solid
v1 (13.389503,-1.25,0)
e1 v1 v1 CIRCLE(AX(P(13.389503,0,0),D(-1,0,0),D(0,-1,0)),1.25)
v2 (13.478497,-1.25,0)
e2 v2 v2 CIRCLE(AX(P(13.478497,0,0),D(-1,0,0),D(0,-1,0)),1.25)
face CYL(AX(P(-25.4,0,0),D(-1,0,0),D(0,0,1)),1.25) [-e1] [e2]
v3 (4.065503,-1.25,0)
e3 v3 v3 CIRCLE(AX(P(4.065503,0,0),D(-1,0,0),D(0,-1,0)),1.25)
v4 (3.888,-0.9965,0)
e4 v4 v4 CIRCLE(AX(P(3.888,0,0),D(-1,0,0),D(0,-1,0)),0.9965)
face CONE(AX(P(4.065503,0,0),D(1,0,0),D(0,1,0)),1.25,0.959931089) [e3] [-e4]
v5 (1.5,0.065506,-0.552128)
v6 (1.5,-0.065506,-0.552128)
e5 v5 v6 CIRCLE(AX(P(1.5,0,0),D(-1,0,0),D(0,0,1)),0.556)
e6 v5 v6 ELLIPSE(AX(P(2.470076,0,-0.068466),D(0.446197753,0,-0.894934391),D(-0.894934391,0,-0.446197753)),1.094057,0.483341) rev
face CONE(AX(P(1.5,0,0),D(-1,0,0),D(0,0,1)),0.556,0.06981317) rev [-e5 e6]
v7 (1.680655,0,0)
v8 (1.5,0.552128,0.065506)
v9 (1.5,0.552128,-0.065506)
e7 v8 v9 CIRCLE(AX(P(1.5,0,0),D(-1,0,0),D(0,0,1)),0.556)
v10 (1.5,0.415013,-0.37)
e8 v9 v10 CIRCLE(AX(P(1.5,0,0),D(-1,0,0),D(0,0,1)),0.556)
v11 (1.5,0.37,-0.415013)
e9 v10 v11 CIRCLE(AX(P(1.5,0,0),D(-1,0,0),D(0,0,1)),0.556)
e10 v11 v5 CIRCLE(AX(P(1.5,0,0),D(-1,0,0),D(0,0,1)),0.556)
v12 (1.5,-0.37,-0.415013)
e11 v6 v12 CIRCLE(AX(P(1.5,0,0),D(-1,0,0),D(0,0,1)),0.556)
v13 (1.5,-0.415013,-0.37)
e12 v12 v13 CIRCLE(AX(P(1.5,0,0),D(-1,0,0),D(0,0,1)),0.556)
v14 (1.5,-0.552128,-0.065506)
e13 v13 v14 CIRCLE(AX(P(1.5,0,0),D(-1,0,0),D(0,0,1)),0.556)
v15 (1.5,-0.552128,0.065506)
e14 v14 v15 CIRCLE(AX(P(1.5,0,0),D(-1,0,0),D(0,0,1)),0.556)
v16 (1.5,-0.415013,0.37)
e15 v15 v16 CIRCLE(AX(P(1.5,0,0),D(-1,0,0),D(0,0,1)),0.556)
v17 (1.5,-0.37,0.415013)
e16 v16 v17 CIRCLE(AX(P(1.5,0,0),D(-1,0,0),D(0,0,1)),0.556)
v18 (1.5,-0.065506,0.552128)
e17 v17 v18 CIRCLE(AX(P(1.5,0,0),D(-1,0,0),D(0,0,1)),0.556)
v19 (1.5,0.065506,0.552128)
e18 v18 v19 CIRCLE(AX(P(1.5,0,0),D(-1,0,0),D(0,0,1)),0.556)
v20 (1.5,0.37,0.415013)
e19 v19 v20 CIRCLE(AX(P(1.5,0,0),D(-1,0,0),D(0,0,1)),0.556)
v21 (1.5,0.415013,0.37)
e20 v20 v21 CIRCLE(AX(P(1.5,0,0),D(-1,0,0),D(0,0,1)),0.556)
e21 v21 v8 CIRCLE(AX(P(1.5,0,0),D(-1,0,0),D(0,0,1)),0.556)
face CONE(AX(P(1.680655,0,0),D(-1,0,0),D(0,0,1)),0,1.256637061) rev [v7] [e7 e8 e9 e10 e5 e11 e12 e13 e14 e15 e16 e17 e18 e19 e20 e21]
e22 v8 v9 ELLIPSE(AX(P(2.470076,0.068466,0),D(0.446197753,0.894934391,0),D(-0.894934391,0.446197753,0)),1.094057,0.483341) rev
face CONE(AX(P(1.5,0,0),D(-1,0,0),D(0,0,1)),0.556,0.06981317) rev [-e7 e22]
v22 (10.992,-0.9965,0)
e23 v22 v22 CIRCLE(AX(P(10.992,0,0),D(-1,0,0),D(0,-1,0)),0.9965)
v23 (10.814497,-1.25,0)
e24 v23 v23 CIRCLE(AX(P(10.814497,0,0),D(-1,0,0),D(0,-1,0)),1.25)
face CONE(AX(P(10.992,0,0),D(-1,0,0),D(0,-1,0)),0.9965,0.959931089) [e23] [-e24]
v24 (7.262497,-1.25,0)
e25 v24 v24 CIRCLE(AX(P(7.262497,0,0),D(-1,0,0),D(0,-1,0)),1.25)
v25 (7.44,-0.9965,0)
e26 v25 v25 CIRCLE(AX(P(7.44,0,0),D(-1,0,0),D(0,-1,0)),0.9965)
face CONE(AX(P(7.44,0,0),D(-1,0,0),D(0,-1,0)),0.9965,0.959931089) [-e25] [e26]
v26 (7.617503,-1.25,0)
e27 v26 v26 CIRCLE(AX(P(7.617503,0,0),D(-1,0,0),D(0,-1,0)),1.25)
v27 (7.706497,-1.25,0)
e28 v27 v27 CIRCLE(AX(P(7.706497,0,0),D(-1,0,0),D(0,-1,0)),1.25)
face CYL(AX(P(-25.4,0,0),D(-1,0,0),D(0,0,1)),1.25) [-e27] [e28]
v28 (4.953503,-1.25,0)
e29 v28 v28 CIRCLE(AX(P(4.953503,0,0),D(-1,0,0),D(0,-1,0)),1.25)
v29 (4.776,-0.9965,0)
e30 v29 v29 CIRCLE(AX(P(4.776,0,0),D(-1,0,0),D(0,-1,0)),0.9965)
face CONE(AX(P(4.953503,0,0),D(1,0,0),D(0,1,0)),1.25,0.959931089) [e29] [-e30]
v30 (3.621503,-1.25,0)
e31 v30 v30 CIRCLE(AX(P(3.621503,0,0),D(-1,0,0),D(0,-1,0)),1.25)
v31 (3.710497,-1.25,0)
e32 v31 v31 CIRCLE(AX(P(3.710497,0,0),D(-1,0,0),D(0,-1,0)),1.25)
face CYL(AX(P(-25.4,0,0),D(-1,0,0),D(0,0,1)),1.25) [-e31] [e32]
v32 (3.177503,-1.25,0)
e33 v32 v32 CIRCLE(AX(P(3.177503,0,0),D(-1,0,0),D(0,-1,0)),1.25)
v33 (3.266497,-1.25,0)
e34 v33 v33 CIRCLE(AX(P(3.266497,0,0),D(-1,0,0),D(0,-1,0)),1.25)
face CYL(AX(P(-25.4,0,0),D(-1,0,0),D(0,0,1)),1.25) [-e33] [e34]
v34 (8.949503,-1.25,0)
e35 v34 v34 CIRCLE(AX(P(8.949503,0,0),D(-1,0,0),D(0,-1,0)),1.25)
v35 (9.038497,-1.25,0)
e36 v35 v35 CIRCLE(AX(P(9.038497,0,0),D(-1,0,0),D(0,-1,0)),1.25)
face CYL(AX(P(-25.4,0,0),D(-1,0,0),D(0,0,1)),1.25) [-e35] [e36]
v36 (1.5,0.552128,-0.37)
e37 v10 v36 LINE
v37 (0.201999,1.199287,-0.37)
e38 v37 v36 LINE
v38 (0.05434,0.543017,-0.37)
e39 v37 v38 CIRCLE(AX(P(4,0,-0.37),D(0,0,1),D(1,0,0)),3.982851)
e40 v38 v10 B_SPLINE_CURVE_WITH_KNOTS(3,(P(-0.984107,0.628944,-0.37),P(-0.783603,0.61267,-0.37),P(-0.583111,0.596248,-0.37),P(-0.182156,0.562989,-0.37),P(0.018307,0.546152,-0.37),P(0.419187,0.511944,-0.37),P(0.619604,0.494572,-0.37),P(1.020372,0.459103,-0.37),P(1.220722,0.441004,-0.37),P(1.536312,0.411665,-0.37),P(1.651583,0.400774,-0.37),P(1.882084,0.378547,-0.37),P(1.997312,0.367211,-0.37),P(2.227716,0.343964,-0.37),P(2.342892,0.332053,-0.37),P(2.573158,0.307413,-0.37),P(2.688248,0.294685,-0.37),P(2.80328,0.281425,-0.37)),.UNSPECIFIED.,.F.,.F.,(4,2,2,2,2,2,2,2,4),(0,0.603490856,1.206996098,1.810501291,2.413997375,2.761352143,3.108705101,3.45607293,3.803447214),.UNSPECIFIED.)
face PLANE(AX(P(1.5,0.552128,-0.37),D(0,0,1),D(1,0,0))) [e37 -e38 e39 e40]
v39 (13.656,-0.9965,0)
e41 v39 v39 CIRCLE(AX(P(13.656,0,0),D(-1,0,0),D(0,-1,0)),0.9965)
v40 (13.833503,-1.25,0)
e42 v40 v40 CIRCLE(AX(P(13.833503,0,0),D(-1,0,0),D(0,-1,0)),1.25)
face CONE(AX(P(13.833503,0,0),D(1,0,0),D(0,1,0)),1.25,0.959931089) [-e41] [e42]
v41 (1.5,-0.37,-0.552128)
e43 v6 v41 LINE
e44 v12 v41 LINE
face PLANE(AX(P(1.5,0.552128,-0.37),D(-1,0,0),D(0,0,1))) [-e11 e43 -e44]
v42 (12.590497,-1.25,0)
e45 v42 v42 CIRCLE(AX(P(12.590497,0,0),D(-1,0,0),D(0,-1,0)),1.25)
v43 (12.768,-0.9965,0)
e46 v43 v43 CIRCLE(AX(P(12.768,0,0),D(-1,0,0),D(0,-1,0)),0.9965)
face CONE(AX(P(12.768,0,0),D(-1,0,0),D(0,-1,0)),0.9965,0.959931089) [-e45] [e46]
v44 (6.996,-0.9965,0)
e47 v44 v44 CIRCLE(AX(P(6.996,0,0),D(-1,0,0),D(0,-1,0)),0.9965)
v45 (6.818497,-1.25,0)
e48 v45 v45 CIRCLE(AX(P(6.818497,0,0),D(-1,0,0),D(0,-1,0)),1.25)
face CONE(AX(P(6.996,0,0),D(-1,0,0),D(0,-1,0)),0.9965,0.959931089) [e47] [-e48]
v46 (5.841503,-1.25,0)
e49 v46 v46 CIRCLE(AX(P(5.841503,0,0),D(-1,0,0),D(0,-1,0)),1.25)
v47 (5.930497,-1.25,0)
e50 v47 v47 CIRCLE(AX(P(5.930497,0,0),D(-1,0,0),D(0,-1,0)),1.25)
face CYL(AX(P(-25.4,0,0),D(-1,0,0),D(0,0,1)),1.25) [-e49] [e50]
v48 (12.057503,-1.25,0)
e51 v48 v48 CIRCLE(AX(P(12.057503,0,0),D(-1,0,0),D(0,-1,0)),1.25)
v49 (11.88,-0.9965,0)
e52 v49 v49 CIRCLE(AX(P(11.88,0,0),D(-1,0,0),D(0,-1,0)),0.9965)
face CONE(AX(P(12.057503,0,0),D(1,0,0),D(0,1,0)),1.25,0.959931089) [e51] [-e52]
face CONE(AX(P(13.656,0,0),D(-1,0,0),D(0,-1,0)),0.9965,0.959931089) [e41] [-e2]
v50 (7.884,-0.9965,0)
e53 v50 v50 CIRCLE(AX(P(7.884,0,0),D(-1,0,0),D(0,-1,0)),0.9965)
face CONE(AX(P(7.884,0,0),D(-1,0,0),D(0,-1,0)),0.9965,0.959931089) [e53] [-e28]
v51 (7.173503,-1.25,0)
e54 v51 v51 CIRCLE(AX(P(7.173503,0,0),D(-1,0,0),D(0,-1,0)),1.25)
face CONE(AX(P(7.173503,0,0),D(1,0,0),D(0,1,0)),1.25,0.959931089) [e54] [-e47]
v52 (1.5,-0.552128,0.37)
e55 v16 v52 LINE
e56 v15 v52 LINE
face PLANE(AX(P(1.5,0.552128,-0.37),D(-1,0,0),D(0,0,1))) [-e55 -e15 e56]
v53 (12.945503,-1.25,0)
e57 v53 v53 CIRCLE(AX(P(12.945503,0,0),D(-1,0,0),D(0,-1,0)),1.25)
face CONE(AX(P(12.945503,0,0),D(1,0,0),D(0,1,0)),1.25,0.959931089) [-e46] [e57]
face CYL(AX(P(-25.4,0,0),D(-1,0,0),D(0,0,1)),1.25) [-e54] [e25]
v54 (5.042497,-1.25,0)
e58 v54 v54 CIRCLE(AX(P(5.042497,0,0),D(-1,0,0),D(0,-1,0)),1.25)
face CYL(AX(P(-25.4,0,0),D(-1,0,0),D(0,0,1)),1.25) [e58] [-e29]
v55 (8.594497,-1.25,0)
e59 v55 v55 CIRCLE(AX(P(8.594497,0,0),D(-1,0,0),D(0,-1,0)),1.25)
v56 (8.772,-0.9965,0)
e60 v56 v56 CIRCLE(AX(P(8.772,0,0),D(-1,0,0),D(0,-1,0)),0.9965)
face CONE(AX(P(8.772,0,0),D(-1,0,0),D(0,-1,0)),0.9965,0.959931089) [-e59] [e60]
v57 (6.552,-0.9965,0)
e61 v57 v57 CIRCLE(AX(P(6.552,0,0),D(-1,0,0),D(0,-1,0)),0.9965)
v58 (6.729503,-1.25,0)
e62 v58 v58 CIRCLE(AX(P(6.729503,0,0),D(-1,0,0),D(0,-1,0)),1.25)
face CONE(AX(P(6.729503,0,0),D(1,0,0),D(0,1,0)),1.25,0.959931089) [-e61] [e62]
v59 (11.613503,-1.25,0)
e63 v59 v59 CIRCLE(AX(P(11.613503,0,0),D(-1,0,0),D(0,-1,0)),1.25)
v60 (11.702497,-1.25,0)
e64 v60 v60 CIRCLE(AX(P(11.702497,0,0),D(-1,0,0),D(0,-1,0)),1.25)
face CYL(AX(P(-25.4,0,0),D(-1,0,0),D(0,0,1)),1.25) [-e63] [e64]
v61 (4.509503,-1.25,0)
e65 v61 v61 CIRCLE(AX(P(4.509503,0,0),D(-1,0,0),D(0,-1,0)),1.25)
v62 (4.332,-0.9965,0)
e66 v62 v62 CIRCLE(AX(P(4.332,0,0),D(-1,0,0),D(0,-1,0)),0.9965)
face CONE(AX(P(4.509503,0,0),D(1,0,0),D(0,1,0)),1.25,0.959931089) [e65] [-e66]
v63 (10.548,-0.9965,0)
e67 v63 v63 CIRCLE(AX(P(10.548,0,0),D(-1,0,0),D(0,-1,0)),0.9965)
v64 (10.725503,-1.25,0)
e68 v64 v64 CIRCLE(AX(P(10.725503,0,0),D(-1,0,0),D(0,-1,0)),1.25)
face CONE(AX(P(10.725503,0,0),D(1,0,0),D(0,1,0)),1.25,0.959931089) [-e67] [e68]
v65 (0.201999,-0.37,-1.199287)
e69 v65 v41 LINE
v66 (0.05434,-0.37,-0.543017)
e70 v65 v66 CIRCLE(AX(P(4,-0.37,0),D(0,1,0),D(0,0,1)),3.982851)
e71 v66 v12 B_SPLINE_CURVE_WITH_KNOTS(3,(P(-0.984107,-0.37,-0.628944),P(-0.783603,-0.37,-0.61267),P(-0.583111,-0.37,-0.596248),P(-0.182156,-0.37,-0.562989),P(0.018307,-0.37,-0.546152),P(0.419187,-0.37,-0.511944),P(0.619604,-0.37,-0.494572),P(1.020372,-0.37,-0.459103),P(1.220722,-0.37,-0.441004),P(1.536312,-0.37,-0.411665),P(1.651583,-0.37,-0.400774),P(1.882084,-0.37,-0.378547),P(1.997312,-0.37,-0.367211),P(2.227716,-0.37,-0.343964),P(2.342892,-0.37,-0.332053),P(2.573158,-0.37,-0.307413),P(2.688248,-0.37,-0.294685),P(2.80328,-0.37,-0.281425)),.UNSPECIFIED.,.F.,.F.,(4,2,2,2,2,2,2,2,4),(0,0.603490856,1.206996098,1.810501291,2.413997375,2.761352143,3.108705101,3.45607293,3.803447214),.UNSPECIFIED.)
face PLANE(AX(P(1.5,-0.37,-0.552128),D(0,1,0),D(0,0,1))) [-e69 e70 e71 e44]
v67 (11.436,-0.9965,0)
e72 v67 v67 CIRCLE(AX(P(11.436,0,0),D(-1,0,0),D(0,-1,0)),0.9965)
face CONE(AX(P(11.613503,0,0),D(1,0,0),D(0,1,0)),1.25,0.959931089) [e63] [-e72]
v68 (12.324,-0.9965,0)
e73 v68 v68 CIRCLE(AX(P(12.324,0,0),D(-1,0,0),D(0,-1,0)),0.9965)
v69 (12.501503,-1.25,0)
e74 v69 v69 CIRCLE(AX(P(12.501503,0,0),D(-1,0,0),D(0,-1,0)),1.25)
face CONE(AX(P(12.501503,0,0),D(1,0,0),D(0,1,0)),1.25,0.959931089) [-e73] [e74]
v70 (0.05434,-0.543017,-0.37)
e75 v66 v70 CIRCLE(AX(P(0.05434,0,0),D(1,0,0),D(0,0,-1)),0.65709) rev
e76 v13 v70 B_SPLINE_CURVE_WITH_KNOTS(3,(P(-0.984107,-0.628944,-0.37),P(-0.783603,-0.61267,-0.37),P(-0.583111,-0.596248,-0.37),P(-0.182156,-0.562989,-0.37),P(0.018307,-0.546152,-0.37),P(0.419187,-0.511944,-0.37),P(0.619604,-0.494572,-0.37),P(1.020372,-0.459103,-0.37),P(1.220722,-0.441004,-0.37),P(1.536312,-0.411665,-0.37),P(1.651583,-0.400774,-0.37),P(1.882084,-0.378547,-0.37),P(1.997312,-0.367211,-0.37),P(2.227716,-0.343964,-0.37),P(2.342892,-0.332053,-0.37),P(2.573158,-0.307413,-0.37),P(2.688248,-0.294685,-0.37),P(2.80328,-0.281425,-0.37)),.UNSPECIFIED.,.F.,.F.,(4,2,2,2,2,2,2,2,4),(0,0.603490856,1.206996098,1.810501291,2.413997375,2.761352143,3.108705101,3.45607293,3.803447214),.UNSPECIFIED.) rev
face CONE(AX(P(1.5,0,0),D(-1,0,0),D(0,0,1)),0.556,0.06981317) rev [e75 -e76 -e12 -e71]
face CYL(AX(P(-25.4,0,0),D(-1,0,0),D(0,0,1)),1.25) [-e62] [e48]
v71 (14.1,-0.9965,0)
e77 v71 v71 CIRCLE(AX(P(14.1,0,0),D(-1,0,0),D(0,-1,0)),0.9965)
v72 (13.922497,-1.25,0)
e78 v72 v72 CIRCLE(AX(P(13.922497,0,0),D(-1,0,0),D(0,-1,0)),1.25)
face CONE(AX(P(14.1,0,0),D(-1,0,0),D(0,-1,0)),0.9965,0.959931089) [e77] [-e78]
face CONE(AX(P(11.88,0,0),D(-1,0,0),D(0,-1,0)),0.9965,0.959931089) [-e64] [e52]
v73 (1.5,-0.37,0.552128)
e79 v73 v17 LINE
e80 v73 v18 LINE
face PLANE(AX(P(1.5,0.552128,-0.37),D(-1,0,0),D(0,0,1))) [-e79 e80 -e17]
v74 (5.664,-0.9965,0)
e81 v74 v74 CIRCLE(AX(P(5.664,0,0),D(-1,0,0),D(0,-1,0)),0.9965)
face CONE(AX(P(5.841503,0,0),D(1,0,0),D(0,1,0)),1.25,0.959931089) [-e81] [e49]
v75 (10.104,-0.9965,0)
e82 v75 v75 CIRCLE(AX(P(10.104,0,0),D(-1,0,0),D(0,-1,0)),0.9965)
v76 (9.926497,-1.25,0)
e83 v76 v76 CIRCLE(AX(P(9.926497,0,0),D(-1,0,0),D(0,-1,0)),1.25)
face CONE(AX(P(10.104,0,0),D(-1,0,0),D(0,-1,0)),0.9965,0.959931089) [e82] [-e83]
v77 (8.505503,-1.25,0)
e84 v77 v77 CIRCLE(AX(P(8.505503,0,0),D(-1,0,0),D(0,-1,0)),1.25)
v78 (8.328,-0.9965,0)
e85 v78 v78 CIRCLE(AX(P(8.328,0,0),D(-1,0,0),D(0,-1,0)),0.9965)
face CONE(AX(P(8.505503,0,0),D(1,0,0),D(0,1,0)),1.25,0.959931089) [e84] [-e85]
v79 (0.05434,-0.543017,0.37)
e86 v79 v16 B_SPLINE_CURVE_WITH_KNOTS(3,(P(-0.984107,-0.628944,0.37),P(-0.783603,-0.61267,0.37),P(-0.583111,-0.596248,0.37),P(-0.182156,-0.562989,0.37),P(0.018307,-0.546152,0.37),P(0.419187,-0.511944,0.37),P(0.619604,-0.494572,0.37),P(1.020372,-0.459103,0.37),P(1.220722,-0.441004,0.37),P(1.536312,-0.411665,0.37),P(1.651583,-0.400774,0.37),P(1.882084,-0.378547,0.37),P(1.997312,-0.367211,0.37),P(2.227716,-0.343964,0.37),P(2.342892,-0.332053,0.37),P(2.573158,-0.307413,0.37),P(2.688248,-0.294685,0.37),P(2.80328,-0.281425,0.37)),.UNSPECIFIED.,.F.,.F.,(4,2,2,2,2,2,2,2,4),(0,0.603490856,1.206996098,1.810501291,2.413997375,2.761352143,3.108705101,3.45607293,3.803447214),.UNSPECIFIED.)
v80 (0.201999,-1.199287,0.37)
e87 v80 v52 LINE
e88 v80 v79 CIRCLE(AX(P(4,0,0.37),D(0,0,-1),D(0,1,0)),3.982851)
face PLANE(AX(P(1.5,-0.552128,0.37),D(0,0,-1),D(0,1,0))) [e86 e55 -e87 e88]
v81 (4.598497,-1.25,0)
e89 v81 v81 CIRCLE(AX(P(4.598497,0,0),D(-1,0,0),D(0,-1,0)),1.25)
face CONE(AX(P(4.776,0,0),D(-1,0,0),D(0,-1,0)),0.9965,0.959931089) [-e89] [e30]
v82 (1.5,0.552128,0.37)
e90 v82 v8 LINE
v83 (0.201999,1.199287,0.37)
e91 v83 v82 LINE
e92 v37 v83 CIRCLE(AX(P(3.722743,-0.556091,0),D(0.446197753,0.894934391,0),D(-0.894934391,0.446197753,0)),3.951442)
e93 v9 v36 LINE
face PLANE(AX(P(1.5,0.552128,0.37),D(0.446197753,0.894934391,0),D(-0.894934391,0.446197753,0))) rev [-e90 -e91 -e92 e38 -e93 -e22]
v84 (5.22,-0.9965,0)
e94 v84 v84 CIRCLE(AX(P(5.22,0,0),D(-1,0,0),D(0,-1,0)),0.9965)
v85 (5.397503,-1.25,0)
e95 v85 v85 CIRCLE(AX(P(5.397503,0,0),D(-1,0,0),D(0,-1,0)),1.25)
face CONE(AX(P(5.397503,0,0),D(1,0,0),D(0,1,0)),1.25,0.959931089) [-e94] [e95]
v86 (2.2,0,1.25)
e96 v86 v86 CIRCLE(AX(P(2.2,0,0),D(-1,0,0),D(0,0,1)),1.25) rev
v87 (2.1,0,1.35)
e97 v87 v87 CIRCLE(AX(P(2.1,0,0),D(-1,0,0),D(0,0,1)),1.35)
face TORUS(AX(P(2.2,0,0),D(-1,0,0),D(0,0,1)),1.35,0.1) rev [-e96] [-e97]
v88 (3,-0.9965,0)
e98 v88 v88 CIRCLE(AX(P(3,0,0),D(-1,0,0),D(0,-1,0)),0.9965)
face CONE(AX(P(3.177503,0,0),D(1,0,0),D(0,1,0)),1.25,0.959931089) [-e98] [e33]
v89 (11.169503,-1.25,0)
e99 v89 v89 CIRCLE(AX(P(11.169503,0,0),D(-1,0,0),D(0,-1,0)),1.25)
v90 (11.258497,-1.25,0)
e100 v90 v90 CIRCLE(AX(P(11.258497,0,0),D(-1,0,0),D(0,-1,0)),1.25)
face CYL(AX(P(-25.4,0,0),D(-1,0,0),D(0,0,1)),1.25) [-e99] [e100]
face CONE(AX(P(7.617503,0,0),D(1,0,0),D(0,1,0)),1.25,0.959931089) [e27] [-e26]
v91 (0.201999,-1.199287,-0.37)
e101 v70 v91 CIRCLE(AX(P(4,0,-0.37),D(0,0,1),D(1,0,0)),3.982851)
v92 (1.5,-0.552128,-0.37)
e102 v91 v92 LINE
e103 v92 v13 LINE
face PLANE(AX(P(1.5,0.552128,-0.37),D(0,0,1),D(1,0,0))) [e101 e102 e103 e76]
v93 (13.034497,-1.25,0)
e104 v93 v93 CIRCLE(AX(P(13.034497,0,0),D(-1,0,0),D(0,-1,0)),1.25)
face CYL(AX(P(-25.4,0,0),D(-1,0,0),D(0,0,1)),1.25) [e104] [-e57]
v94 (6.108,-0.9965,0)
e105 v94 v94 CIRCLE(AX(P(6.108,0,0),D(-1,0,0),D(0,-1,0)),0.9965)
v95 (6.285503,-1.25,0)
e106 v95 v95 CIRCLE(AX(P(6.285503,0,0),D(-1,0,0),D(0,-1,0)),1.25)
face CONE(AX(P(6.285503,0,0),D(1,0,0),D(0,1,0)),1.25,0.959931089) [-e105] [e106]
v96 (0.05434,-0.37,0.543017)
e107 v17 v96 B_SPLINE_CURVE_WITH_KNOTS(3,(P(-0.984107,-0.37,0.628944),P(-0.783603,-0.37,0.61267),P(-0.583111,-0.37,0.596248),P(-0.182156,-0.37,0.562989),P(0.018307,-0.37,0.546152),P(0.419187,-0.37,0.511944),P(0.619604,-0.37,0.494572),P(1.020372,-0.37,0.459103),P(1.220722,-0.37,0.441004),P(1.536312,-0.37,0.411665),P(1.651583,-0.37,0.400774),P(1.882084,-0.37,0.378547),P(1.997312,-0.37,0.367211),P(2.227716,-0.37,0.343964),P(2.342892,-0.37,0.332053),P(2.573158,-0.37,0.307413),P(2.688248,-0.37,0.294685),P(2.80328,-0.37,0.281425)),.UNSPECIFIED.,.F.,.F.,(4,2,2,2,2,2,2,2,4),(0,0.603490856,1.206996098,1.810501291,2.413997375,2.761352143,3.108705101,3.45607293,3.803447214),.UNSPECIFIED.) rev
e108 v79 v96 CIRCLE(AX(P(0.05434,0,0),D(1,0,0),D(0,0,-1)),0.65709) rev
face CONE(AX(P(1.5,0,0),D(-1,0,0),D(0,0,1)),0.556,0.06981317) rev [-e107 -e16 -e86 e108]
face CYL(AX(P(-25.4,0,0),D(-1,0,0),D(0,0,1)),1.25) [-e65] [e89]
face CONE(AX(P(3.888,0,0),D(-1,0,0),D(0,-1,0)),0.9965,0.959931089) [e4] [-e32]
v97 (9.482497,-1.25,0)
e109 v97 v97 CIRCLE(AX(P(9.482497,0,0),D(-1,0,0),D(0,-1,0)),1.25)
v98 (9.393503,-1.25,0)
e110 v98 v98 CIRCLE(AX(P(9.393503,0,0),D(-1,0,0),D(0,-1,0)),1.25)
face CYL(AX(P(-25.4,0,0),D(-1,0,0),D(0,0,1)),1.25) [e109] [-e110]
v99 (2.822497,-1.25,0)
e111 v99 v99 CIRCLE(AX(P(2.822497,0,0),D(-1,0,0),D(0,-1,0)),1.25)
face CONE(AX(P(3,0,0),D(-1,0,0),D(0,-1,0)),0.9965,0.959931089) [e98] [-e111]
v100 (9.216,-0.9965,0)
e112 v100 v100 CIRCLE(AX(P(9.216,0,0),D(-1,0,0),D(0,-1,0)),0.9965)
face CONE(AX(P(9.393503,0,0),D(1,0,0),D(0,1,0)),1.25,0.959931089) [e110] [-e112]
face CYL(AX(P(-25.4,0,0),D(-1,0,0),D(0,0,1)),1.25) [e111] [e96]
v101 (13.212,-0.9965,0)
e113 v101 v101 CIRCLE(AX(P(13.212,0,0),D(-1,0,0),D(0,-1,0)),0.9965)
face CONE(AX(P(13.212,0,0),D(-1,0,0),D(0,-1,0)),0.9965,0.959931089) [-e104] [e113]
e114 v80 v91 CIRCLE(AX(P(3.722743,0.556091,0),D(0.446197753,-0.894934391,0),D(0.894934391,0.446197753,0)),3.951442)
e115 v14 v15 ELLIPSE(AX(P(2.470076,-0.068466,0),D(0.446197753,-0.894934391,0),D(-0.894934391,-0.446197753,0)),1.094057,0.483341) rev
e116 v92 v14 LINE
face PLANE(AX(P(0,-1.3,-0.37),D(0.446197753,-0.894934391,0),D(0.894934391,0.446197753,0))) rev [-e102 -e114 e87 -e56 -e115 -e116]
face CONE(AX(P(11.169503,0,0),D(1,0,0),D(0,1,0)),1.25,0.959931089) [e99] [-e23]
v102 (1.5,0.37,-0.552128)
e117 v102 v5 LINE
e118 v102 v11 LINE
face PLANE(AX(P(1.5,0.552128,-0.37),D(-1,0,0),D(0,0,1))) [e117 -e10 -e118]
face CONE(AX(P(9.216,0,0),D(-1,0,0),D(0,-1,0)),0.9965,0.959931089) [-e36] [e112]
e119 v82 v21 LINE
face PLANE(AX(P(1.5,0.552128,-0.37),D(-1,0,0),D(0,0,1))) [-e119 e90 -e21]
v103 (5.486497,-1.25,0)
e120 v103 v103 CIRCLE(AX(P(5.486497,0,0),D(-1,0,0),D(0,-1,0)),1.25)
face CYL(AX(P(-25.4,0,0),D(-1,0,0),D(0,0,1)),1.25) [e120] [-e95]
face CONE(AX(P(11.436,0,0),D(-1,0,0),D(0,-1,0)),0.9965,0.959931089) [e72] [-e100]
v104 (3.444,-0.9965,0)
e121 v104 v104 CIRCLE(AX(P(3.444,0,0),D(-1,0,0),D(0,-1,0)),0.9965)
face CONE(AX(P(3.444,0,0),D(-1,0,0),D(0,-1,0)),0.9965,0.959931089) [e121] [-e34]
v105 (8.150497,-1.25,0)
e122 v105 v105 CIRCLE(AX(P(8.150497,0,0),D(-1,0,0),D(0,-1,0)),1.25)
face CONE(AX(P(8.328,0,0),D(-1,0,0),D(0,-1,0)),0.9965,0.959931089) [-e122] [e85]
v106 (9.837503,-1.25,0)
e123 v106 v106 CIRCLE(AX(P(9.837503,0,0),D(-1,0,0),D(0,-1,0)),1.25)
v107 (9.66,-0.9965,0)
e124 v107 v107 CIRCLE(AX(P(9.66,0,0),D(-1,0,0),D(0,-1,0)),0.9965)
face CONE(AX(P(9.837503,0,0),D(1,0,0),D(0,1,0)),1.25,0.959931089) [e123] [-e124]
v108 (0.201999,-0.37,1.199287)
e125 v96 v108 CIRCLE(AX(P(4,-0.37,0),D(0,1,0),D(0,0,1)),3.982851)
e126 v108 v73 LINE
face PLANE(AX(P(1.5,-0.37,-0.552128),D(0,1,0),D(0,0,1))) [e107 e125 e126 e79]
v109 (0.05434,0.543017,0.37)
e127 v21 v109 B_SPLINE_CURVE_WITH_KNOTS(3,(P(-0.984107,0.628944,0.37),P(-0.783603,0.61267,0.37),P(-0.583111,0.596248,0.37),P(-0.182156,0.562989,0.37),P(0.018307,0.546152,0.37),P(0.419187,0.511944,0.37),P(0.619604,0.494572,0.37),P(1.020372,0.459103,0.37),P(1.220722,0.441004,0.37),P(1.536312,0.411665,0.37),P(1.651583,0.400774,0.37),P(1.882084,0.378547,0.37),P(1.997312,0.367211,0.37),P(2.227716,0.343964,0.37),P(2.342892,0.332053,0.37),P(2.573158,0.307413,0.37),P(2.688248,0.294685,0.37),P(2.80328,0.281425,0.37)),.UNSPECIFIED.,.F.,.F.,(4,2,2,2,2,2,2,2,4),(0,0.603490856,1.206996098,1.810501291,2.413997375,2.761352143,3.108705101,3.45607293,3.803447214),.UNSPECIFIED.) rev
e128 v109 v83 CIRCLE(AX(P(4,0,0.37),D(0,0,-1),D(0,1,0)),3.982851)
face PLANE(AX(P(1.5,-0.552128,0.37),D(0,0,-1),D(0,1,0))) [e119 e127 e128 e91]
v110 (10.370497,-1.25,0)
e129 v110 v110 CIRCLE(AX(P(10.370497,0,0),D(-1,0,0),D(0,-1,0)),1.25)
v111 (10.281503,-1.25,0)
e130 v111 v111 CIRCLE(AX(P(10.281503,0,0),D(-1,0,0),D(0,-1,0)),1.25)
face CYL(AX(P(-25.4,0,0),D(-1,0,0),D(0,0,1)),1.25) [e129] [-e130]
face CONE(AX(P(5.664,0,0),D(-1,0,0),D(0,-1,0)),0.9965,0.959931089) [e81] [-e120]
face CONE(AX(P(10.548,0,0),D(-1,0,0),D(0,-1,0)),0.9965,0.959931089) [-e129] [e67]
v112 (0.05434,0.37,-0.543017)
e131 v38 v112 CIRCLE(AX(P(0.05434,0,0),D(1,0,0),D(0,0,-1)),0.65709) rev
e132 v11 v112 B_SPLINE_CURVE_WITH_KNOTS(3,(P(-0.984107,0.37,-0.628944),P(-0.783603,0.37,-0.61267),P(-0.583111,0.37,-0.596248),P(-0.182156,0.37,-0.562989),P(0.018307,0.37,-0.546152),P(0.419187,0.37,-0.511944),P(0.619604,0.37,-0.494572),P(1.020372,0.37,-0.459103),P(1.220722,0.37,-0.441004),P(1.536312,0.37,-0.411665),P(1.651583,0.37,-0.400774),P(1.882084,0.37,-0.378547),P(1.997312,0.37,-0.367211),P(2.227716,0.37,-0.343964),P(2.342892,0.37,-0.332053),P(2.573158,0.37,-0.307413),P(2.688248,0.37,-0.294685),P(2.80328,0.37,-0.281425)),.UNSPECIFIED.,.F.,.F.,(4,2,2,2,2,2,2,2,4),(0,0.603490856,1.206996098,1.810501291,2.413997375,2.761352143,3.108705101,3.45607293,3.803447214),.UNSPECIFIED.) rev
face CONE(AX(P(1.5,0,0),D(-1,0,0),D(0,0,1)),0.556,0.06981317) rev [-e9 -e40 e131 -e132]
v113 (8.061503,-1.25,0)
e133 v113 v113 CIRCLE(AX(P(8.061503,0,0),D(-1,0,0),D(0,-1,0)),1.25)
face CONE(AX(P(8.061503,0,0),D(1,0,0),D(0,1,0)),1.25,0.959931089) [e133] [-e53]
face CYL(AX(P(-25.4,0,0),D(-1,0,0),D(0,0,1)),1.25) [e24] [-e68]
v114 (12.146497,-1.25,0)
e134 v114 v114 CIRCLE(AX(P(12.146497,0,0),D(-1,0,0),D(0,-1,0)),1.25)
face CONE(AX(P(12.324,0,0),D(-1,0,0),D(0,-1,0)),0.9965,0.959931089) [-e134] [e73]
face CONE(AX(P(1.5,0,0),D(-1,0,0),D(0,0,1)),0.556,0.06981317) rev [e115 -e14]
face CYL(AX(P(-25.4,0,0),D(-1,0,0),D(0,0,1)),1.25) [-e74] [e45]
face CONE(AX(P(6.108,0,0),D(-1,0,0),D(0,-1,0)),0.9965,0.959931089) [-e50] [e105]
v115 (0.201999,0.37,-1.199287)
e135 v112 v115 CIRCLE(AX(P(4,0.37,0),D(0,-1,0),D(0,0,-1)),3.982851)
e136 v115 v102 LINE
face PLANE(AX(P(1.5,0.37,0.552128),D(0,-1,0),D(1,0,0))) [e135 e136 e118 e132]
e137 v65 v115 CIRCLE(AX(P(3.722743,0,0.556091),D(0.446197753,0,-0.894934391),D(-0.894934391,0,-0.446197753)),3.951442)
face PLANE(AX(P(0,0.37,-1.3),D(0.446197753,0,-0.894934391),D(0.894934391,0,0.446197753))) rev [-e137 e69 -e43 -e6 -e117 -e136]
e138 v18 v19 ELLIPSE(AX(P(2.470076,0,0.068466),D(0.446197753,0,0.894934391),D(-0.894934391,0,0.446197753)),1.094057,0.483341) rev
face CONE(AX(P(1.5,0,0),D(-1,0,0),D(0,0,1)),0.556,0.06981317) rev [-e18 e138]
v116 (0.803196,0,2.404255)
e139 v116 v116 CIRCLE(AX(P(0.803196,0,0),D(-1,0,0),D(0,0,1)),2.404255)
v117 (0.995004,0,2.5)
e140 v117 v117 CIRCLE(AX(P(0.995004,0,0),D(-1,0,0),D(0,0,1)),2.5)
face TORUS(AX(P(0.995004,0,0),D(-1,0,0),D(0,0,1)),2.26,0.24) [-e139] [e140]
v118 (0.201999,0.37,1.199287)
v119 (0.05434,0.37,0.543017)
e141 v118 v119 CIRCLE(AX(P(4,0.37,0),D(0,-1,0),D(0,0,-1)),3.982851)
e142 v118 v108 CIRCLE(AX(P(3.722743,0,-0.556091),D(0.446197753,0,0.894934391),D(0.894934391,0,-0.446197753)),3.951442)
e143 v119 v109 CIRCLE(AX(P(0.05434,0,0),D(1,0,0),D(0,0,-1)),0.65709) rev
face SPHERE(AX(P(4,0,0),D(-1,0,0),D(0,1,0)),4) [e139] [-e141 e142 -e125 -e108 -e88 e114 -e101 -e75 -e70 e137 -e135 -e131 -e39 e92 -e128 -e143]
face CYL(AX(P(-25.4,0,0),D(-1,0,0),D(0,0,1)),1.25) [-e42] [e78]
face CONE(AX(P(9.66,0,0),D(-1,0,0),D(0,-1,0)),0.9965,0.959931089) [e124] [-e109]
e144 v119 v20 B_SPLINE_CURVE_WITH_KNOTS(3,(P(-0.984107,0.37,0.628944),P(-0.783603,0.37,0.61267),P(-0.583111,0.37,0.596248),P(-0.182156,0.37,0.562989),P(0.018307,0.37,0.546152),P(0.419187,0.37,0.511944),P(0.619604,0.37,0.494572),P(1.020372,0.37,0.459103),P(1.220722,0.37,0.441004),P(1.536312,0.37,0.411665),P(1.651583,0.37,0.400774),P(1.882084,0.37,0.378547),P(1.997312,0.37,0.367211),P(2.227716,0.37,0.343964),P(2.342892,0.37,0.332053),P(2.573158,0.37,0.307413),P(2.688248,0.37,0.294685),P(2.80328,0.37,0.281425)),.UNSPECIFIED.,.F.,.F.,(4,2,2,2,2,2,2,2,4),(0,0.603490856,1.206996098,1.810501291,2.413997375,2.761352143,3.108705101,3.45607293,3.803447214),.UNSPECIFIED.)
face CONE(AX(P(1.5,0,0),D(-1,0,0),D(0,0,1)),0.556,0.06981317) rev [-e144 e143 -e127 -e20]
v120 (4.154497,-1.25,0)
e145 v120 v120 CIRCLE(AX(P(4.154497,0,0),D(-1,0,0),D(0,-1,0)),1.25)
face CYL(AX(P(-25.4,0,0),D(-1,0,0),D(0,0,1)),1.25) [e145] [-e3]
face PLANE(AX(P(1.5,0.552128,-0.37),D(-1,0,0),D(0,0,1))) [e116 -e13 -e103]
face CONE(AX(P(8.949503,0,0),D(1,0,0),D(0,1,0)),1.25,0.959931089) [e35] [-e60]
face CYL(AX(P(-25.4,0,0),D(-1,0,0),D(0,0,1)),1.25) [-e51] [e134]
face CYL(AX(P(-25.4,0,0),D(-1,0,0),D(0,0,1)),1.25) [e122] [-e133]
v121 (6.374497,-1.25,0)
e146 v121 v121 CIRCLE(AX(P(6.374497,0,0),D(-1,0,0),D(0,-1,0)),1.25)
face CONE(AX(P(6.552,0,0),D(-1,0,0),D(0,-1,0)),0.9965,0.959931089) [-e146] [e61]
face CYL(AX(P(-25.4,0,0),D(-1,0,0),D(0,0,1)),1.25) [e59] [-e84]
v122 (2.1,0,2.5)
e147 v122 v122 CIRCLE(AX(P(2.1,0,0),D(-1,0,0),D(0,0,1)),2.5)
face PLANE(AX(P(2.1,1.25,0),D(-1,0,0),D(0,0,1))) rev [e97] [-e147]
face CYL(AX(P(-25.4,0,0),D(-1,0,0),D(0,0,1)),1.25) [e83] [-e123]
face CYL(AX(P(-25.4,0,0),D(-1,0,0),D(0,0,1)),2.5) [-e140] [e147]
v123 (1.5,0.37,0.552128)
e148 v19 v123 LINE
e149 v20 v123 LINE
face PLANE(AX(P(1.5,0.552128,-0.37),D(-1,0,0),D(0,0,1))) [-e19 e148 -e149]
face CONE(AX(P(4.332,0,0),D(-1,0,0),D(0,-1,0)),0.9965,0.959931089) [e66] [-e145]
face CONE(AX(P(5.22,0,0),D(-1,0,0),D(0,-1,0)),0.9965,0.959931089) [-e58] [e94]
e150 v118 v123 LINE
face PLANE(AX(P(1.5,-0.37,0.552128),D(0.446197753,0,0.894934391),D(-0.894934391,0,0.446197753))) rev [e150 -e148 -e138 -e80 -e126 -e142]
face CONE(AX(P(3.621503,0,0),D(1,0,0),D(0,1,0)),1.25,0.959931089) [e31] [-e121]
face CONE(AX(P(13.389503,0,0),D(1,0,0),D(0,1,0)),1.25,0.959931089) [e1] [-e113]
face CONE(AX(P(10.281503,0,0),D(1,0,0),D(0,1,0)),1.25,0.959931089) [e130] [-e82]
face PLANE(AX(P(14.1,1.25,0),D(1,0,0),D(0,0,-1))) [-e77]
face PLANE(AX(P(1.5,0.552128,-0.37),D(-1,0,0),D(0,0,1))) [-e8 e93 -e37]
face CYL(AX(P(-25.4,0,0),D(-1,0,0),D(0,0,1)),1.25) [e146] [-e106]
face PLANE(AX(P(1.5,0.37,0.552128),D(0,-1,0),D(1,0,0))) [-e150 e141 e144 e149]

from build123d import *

# Parameters (mm, degrees)
RECPAT_COUNT    = 2
RECPAT_ANGLE    = 90
THDSCHPAT_COUNT = 26
THDSCHPAT_PITCH = 0.444


with BuildPart() as part:
    # Fillet1: read off the stored shape, not the designer's step
    # Fillet1 outline → Fillet1 (revolve)
    with BuildSketch(Plane.YX):
        with BuildLine():
            Line((1.25, 2.2), (1.25, 14.1))
            Line((1.25, 14.1), (0, 14.1))
            Line((0, 14.1), (0, 0))
            ThreePointArc((0, 0), (1.267435139, 0.206109099), (2.404255321, 0.803195916))
            ThreePointArc((2.404255321, 0.803195916), (2.474733878, 0.88781572), (2.5, 0.99500416))
            Line((2.5, 0.99500416), (2.5, 2.1))
            Line((2.5, 2.1), (1.35, 2.1))
            ThreePointArc((1.35, 2.1), (1.279289322, 2.129289322), (1.25, 2.2))
        make_face()
    revolve(axis=Axis((0, 0, 0), (1, 0, 0)))

    # Sketch3 → Recess section 0
    with BuildSketch(Plane(origin=(0, 0, 0), x_dir=(0, 0, -1), z_dir=(1, 0, 0))):
        with BuildLine():
            Line((0.37, -1.3), (-0.37, -1.3))
            Line((-0.37, -1.3), (-0.37, 1.3))
            Line((-0.37, 1.3), (0.37, 1.3))
            Line((0.37, 1.3), (0.37, -1.3))
        make_face()
    # Sketch4 → Recess section 1
    with BuildSketch(Plane(origin=(1.5, 0, 0), x_dir=(0, 0, -1), z_dir=(1, 0, 0))):
        with BuildLine():
            Line((0.37, -0.552127713), (-0.37, -0.552127713))
            Line((-0.37, -0.552127713), (-0.37, 0.552127713))
            Line((-0.37, 0.552127713), (0.37, 0.552127713))
            Line((0.37, 0.552127713), (0.37, -0.552127713))
        make_face()
    recess = loft(mode=Mode.SUBTRACT)

    # RecPat: Recess ×2 about axis
    recpat_axis = Axis((0, 0, 0), (1, 0, 0))
    for i in range(1, RECPAT_COUNT):
        add(recess.rotate(recpat_axis, i * RECPAT_ANGLE / (RECPAT_COUNT - 1)), mode=Mode.SUBTRACT)

    # RecCorSke → RecessCore (revolve, cut)
    with BuildSketch(Plane.XY, mode=Mode.PRIVATE) as recesscore_sk:
        Polygon((0, 0), (0, 0.660890218), (1.5, 0.556), (1.680655351, 0), align=None)
    revolve(recesscore_sk.sketch.rotate(Axis((-3.175, 0, 0), (1, 0, 0)), 90), axis=Axis((-3.175, 0, 0), (1, 0, 0)), mode=Mode.SUBTRACT)

    # ThdSchSke → ThreadSchematic (revolve, cut)
    with BuildSketch(Plane.XY, mode=Mode.PRIVATE) as threadschematic_sk:
        Polygon((3, -0.9965), (2.822497389, -1.25), (2.822497389, -1.5625), (3.177502611, -1.5625), (3.177502611, -1.25), align=None)
    threadschematic = revolve(threadschematic_sk.sketch.rotate(Axis((-3.175, 0, 0), (1, 0, 0)), 270), axis=Axis((-3.175, 0, 0), (1, 0, 0)), mode=Mode.SUBTRACT)

    # ThdSchPat: ThreadSchematic ×26
    with Locations(*[(i * THDSCHPAT_PITCH, 0, 0) for i in range(1, THDSCHPAT_COUNT)]):
        add(threadschematic, mode=Mode.SUBTRACT)


solid = part.part
